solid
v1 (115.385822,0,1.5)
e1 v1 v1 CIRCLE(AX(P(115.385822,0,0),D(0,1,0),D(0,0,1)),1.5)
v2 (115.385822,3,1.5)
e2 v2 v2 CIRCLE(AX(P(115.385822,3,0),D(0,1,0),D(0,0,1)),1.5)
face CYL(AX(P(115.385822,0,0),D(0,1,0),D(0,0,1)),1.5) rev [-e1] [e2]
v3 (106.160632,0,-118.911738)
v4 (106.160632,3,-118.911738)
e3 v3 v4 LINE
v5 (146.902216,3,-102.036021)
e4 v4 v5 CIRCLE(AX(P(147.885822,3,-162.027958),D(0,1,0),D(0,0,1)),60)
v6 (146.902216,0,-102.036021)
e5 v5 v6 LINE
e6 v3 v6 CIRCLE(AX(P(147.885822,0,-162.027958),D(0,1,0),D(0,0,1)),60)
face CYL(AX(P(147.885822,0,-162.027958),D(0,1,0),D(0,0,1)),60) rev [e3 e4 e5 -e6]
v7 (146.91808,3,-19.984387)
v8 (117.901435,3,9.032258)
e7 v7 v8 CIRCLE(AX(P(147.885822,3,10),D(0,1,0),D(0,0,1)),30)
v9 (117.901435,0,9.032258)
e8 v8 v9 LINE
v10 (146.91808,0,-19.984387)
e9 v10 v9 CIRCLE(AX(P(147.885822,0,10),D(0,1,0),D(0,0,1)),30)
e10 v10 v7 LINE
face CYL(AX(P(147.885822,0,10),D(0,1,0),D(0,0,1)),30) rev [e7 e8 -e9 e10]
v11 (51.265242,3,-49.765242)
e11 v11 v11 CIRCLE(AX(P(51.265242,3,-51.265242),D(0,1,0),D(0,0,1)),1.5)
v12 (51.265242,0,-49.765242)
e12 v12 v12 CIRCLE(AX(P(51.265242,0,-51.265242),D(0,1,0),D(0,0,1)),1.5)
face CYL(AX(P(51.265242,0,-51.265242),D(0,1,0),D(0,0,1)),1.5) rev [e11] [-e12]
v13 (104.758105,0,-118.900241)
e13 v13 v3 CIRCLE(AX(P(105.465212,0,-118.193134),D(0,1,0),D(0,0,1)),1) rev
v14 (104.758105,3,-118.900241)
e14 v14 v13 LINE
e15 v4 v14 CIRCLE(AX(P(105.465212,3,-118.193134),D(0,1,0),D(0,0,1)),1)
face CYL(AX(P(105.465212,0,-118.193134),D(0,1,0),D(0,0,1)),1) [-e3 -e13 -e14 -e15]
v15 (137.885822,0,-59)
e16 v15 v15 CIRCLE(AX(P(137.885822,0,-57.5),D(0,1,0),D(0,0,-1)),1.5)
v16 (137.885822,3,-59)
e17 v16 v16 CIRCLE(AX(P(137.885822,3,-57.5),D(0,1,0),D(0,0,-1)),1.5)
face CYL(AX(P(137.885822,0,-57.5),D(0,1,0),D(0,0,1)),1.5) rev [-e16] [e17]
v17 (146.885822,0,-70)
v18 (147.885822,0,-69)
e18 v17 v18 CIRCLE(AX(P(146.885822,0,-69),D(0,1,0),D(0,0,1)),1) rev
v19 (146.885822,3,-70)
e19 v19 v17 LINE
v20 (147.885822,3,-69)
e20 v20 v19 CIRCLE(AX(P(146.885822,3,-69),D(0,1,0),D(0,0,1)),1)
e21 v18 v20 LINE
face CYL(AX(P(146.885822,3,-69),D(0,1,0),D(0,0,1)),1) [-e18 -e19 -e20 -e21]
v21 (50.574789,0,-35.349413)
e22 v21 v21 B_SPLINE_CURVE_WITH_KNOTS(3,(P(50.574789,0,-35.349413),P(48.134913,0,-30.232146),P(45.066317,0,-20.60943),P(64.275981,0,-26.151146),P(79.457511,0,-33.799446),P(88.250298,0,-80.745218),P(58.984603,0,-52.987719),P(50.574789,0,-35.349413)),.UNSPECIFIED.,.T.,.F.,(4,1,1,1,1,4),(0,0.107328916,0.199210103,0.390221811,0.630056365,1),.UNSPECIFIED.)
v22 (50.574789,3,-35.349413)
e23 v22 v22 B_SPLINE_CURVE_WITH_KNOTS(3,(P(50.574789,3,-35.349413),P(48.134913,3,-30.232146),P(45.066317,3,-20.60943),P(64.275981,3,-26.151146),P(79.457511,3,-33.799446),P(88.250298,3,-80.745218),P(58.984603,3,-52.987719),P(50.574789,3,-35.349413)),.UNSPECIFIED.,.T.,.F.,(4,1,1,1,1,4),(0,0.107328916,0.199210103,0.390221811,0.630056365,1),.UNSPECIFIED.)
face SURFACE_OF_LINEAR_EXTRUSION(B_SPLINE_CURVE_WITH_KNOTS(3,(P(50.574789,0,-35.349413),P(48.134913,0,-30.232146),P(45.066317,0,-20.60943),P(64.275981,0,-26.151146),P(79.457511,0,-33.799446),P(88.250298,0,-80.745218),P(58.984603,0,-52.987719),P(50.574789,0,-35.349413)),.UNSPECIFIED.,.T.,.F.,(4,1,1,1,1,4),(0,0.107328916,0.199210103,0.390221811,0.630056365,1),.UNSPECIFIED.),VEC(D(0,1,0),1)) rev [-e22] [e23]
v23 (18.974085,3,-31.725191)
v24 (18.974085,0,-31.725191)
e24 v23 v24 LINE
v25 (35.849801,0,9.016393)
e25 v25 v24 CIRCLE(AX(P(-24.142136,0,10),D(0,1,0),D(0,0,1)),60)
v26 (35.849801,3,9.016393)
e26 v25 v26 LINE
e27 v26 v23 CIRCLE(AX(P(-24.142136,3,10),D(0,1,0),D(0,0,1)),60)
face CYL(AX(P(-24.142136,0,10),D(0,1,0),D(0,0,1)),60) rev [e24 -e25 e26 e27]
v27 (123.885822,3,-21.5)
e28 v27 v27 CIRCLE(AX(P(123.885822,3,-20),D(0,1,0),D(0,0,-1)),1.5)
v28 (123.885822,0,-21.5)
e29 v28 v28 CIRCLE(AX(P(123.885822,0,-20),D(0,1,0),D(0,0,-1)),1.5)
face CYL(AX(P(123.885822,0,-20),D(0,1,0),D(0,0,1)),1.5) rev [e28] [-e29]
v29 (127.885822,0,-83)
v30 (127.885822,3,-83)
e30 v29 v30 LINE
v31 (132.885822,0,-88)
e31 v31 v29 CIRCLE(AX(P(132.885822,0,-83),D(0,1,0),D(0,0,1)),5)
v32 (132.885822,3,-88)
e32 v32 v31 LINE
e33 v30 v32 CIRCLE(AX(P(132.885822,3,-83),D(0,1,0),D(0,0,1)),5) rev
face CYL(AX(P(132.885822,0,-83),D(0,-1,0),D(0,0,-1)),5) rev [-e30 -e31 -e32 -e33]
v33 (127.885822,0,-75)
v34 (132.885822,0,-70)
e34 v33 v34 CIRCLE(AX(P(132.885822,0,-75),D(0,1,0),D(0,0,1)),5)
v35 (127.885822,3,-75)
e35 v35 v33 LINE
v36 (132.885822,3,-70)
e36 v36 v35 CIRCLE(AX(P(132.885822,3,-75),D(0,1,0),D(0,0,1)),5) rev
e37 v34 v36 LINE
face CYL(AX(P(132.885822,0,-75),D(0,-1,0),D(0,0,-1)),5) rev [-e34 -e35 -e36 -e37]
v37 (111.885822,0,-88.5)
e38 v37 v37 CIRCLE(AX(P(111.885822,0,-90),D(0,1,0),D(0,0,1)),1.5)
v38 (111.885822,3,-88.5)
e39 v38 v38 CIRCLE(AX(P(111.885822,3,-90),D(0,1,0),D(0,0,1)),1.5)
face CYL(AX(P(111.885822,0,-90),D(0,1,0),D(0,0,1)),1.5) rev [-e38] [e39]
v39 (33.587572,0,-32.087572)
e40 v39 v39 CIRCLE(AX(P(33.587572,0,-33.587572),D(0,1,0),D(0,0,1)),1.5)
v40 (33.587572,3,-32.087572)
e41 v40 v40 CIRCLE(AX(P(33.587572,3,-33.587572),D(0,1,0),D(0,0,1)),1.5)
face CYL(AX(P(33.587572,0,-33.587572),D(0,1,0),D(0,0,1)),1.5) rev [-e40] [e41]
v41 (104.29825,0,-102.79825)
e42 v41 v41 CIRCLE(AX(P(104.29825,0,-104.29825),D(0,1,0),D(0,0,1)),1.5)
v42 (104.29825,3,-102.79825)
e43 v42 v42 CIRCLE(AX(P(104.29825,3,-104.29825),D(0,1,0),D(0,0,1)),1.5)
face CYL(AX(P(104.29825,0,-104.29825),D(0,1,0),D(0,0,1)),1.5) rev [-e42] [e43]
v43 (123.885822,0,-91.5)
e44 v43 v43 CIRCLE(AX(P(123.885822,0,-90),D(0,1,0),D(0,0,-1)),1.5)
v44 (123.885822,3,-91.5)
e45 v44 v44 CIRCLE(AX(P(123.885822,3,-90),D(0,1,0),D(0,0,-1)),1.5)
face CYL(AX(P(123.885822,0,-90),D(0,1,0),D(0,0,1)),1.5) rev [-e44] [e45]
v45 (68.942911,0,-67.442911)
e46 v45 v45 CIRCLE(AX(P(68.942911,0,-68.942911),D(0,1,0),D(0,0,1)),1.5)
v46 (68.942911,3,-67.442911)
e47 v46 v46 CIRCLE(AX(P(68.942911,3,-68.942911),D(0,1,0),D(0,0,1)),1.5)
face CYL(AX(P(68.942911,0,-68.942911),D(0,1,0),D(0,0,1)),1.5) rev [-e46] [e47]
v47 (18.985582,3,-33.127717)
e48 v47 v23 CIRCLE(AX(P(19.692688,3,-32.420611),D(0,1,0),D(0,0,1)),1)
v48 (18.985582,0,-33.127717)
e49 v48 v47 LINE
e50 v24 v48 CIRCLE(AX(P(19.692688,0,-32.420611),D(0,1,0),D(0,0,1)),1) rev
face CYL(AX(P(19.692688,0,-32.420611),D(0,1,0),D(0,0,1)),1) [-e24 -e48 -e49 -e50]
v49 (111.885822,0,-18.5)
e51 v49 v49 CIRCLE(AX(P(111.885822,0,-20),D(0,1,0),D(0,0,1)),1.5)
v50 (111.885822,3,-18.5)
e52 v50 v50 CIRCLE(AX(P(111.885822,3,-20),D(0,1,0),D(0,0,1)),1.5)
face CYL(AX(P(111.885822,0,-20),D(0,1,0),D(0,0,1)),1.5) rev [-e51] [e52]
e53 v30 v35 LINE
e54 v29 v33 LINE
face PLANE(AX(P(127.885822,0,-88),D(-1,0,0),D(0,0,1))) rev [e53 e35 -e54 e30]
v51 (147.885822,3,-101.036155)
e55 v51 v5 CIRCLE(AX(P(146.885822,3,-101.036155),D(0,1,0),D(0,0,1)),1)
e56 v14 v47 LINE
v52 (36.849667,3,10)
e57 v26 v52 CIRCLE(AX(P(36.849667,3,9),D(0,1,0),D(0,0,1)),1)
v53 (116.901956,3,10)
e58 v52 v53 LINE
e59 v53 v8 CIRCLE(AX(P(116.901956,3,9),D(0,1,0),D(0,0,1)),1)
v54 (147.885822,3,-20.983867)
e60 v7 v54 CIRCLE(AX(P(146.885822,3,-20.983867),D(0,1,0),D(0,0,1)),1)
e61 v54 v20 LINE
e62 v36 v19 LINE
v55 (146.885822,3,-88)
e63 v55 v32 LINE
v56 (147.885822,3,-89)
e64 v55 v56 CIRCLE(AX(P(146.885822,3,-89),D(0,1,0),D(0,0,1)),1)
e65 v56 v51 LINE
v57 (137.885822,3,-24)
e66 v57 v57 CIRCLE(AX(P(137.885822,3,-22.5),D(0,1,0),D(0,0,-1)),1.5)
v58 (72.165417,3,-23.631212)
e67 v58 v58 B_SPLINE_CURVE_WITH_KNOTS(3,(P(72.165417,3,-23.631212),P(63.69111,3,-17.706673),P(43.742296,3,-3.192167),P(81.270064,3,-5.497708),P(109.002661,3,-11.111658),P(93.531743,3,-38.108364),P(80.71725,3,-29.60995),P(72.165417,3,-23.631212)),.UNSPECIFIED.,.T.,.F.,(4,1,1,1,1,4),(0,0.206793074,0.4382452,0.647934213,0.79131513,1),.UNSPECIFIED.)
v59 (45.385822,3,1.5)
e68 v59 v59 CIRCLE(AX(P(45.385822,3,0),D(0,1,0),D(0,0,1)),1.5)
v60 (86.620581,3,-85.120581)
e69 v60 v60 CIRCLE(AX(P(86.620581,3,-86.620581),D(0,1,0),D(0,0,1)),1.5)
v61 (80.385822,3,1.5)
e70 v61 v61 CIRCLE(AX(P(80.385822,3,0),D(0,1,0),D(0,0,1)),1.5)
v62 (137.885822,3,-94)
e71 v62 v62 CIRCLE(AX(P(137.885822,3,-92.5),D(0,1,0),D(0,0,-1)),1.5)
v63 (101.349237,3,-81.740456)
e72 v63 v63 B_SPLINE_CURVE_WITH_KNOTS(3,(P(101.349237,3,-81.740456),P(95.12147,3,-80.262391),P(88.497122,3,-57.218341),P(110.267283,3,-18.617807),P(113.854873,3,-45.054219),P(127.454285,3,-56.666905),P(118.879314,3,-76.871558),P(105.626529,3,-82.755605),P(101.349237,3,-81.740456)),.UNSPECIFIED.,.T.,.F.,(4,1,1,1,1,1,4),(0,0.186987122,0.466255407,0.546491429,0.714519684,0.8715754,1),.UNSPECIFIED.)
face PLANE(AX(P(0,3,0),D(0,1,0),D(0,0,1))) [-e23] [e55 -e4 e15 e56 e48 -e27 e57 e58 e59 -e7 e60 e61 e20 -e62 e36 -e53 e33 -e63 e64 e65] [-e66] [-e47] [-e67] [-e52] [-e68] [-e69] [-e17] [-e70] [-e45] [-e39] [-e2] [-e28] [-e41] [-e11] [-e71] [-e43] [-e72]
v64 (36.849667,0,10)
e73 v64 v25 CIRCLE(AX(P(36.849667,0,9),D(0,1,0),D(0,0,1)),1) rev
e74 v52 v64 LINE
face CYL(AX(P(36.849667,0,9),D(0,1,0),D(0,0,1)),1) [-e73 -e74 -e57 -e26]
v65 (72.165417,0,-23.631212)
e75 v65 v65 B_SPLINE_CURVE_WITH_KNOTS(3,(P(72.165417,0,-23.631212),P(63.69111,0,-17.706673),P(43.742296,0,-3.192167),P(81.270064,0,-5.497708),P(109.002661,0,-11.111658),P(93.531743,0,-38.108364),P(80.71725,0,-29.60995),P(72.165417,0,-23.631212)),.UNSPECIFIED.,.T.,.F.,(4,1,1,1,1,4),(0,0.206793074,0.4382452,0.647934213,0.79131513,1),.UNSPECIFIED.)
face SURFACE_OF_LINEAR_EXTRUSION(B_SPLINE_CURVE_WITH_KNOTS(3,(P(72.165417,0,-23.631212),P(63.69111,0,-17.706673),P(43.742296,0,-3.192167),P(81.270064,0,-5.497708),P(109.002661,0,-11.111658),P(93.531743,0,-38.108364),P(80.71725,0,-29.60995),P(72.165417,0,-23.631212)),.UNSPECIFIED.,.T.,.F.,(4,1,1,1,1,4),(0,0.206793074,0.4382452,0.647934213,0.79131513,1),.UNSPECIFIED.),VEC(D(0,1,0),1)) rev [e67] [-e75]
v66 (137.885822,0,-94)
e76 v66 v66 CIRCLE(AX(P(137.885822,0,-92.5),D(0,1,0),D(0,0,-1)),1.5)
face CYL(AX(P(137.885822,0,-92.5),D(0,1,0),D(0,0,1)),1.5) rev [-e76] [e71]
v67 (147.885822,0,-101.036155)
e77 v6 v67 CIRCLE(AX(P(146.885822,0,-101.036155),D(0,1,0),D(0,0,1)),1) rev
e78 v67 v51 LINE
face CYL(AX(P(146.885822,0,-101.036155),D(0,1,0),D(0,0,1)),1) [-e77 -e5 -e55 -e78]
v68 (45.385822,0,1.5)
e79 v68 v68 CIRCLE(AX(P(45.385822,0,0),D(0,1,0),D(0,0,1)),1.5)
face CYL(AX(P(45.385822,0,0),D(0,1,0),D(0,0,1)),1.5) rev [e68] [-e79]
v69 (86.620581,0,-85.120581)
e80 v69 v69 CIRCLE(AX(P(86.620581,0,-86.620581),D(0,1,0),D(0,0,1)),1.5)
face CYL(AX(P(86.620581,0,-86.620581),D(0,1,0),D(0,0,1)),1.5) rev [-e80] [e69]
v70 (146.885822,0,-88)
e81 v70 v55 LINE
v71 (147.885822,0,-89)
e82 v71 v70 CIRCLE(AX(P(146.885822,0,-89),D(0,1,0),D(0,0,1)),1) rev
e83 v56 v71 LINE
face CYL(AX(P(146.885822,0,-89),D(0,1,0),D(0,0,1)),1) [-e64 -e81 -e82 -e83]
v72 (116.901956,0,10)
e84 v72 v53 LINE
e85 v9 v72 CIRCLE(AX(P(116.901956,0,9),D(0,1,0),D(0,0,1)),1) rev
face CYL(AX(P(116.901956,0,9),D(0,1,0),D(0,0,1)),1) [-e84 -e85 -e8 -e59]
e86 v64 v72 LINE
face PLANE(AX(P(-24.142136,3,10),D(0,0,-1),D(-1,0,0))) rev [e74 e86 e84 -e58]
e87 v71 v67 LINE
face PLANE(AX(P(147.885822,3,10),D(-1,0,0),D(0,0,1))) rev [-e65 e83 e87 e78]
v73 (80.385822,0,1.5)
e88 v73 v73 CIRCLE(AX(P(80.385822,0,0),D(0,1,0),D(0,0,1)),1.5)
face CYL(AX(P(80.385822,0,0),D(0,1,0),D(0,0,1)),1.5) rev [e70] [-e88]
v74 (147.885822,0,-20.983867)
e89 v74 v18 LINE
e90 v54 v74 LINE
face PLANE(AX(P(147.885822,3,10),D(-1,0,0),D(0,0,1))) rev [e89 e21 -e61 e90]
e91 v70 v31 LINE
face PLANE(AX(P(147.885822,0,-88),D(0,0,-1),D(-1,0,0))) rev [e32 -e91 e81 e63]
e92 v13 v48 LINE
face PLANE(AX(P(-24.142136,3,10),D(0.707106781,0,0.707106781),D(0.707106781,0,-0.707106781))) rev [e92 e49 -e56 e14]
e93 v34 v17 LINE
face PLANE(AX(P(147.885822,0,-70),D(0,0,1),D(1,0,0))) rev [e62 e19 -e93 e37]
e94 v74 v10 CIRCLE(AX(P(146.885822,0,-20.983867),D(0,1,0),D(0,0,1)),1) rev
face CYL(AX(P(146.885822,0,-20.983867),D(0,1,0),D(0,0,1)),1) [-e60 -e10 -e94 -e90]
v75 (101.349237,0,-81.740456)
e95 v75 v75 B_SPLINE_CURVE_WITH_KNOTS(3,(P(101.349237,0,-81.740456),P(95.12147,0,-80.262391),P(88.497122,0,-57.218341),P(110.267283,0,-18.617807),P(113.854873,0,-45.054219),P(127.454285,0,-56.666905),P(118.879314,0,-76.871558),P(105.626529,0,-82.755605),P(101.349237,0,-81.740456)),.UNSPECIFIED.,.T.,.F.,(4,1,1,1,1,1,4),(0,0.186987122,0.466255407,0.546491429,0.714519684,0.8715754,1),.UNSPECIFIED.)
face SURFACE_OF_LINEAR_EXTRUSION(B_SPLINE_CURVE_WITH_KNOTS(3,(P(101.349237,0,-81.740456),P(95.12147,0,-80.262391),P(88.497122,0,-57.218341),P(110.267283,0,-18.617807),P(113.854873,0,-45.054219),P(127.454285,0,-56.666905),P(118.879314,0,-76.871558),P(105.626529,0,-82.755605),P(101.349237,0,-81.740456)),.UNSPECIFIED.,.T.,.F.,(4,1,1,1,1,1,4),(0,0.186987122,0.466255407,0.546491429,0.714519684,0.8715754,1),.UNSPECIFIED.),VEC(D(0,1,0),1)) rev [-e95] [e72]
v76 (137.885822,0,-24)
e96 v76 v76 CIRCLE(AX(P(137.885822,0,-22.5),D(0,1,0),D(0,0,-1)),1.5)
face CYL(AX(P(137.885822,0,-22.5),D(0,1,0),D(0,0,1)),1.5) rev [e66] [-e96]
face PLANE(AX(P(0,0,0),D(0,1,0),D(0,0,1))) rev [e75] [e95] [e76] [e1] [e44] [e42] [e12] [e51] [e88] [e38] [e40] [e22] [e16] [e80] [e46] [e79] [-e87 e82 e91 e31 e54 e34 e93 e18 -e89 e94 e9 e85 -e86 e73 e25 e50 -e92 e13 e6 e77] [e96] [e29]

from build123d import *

# Parameters (mm, degrees)
EXTRUDE_1_DEPTH     = 3
SKETCH_2_R          = 60
SKETCH_2_R_2        = 30
CUT_EXTRUDE_1_DEPTH = 220.390691703
SKETCH_3_R          = 1.5
CUT_EXTRUDE_2_DEPTH = 191.220260404
SKETCH_4_W          = 20
SKETCH_4_H          = 18
CUT_EXTRUDE_3_DEPTH = 191.220260404
FILLET_1_R          = 5
CUT_EXTRUDE_START   = -3
CUT_EXTRUDE_4_DEPTH = 3
FILLET_2_R          = 1


# Read off the part's stored shape, not the designer's step: 切除-拉伸4
with BuildPart() as part:
    # 草图1 → 凸台-拉伸1 (new body)
    with BuildSketch(Plane(origin=(0, 0, 0), x_dir=(1, 0, 0), z_dir=(0, 1, 0))):
        Polygon((147.885822331, -10), (147.885822331, 162.027957955), (-24.142135624, -10), align=None)
    extrude(amount=EXTRUDE_1_DEPTH)

    # 草图2 → 切除-拉伸1 (cut, through all)
    with BuildSketch(Plane(origin=(0, 3, 0), x_dir=(1, 0, 0), z_dir=(0, 1, 0))):
        with Locations((147.885822331, 162.027957955)):
            Circle(SKETCH_2_R)
        with Locations((-24.142135624, -10)):
            Circle(SKETCH_2_R)
        with Locations((147.885822331, -10)):
            Circle(SKETCH_2_R_2)
    extrude(amount=-CUT_EXTRUDE_1_DEPTH, mode=Mode.SUBTRACT)

    # 草图3 → 切除-拉伸2 (cut, through all)
    with BuildSketch(Plane(origin=(0, 3, 0), x_dir=(1, 0, 0), z_dir=(0, 1, 0))):
        with Locations(Location((115.385822331, 0, 0), (0, 0, 270))):
            Circle(SKETCH_3_R)
        with Locations(Location((80.385822331, 0, 0), (0, 0, 270))):
            Circle(SKETCH_3_R)
        with Locations(Location((45.385822331, 0, 0), (0, 0, 270))):
            Circle(SKETCH_3_R)
        with Locations(Location((33.587572106, 33.587572106, 0), (0, 0, 270))):
            Circle(SKETCH_3_R)
        with Locations(Location((51.265241636, 51.265241636, 0), (0, 0, 270))):
            Circle(SKETCH_3_R)
        with Locations(Location((68.942911166, 68.942911166, 0), (0, 0, 270))):
            Circle(SKETCH_3_R)
        with Locations(Location((86.620580695, 86.620580695, 0), (0, 0, 270))):
            Circle(SKETCH_3_R)
        with Locations(Location((104.298250225, 104.298250225, 0), (0, 0, 270))):
            Circle(SKETCH_3_R)
        with Locations(Location((137.885822331, 22.5, 0), (0, 0, 90))):
            Circle(SKETCH_3_R)
        with Locations(Location((137.885822331, 57.5, 0), (0, 0, 90))):
            Circle(SKETCH_3_R)
        with Locations(Location((137.885822331, 92.5, 0), (0, 0, 90))):
            Circle(SKETCH_3_R)
        with Locations(Location((111.885822331, 90, 0), (0, 0, 270))):
            Circle(SKETCH_3_R)
        with Locations(Location((111.885822331, 20, 0), (0, 0, 270))):
            Circle(SKETCH_3_R)
        with Locations(Location((123.885822331, 90, 0), (0, 0, 90))):
            Circle(SKETCH_3_R)
        with Locations(Location((123.885822331, 20, 0), (0, 0, 90))):
            Circle(SKETCH_3_R)
    extrude(amount=-CUT_EXTRUDE_2_DEPTH, mode=Mode.SUBTRACT)

    # 草图4 → 切除-拉伸3 (cut, through all)
    with BuildSketch(Plane(origin=(0, 3, 0), x_dir=(1, 0, 0), z_dir=(0, 1, 0))):
        with Locations((137.885822331, 79)):
            Rectangle(SKETCH_4_W, SKETCH_4_H)
    extrude(amount=-CUT_EXTRUDE_3_DEPTH, mode=Mode.SUBTRACT)

    # 圆角1
    fillet_1_edges = [part.edges().sort_by_distance(p)[0] for p in [
        (127.885822331, 1.5, -70),
        (127.885822331, 1.5, -88),
    ]]
    fillet(fillet_1_edges, radius=FILLET_1_R)

    # 切除-拉伸4 outline → 切除-拉伸4 (cut)
    with BuildSketch(Plane(origin=(0, 3, 0), x_dir=(1, 0, 0), z_dir=(0, 1, 0)).offset(CUT_EXTRUDE_START)):
        with BuildLine():
            add(Edge.make_bspline(
                [(50.5747885, 35.349413139), (48.134913422, 30.232146409), (45.066316723, 20.609429713), (64.275981259, 26.151145773), (79.457511235, 33.799446388), (88.250297614, 80.745218058), (58.984602869, 52.987719157), (50.5747885, 35.349413139)],
                knots=[0, 0, 0, 0, 0.107328916, 0.199210103, 0.390221811, 0.630056365, 1, 1, 1, 1], degree=3))
        make_face()
        with BuildLine():
            add(Edge.make_bspline(
                [(72.165417057, 23.631211719), (63.691109654, 17.706672606), (43.742296227, 3.192166655), (81.270063611, 5.49770819), (109.00266126, 11.111657915), (93.531743282, 38.108363778), (80.717249614, 29.609950047), (72.165417057, 23.631211719)],
                knots=[0, 0, 0, 0, 0.206793074, 0.4382452, 0.647934213, 0.79131513, 1, 1, 1, 1], degree=3))
        make_face()
        with BuildLine():
            add(Edge.make_bspline(
                [(101.34923684, 81.740455866), (95.121470027, 80.262390997), (88.497121545, 57.218340709), (110.267282535, 18.617806799), (113.854872687, 45.05421857), (127.45428515, 56.666904931), (118.879313975, 76.871558074), (105.626528502, 82.755605394), (101.34923684, 81.740455866)],
                knots=[0, 0, 0, 0, 0.186987122, 0.466255407, 0.546491429, 0.714519684, 0.8715754, 1, 1, 1, 1], degree=3))
        make_face()
    extrude(amount=CUT_EXTRUDE_4_DEPTH, mode=Mode.SUBTRACT)

    # 圆角2
    fillet_2_edges = [part.edges().sort_by_distance(p)[0] for p in [
        (147.885822331, 1.5, -88),
        (147.885822331, 1.5, -70),
        (147.885822331, 1.5, -102.027957955),
        (105.45941546, 1.5, -119.601551084),
        (35.857864376, 1.5, 10),
        (18.284271247, 1.5, -32.426406871),
        (117.885822331, 1.5, 10),
        (147.885822331, 1.5, -20),
    ]]
    fillet(fillet_2_edges, radius=FILLET_2_R)


solid = part.part
